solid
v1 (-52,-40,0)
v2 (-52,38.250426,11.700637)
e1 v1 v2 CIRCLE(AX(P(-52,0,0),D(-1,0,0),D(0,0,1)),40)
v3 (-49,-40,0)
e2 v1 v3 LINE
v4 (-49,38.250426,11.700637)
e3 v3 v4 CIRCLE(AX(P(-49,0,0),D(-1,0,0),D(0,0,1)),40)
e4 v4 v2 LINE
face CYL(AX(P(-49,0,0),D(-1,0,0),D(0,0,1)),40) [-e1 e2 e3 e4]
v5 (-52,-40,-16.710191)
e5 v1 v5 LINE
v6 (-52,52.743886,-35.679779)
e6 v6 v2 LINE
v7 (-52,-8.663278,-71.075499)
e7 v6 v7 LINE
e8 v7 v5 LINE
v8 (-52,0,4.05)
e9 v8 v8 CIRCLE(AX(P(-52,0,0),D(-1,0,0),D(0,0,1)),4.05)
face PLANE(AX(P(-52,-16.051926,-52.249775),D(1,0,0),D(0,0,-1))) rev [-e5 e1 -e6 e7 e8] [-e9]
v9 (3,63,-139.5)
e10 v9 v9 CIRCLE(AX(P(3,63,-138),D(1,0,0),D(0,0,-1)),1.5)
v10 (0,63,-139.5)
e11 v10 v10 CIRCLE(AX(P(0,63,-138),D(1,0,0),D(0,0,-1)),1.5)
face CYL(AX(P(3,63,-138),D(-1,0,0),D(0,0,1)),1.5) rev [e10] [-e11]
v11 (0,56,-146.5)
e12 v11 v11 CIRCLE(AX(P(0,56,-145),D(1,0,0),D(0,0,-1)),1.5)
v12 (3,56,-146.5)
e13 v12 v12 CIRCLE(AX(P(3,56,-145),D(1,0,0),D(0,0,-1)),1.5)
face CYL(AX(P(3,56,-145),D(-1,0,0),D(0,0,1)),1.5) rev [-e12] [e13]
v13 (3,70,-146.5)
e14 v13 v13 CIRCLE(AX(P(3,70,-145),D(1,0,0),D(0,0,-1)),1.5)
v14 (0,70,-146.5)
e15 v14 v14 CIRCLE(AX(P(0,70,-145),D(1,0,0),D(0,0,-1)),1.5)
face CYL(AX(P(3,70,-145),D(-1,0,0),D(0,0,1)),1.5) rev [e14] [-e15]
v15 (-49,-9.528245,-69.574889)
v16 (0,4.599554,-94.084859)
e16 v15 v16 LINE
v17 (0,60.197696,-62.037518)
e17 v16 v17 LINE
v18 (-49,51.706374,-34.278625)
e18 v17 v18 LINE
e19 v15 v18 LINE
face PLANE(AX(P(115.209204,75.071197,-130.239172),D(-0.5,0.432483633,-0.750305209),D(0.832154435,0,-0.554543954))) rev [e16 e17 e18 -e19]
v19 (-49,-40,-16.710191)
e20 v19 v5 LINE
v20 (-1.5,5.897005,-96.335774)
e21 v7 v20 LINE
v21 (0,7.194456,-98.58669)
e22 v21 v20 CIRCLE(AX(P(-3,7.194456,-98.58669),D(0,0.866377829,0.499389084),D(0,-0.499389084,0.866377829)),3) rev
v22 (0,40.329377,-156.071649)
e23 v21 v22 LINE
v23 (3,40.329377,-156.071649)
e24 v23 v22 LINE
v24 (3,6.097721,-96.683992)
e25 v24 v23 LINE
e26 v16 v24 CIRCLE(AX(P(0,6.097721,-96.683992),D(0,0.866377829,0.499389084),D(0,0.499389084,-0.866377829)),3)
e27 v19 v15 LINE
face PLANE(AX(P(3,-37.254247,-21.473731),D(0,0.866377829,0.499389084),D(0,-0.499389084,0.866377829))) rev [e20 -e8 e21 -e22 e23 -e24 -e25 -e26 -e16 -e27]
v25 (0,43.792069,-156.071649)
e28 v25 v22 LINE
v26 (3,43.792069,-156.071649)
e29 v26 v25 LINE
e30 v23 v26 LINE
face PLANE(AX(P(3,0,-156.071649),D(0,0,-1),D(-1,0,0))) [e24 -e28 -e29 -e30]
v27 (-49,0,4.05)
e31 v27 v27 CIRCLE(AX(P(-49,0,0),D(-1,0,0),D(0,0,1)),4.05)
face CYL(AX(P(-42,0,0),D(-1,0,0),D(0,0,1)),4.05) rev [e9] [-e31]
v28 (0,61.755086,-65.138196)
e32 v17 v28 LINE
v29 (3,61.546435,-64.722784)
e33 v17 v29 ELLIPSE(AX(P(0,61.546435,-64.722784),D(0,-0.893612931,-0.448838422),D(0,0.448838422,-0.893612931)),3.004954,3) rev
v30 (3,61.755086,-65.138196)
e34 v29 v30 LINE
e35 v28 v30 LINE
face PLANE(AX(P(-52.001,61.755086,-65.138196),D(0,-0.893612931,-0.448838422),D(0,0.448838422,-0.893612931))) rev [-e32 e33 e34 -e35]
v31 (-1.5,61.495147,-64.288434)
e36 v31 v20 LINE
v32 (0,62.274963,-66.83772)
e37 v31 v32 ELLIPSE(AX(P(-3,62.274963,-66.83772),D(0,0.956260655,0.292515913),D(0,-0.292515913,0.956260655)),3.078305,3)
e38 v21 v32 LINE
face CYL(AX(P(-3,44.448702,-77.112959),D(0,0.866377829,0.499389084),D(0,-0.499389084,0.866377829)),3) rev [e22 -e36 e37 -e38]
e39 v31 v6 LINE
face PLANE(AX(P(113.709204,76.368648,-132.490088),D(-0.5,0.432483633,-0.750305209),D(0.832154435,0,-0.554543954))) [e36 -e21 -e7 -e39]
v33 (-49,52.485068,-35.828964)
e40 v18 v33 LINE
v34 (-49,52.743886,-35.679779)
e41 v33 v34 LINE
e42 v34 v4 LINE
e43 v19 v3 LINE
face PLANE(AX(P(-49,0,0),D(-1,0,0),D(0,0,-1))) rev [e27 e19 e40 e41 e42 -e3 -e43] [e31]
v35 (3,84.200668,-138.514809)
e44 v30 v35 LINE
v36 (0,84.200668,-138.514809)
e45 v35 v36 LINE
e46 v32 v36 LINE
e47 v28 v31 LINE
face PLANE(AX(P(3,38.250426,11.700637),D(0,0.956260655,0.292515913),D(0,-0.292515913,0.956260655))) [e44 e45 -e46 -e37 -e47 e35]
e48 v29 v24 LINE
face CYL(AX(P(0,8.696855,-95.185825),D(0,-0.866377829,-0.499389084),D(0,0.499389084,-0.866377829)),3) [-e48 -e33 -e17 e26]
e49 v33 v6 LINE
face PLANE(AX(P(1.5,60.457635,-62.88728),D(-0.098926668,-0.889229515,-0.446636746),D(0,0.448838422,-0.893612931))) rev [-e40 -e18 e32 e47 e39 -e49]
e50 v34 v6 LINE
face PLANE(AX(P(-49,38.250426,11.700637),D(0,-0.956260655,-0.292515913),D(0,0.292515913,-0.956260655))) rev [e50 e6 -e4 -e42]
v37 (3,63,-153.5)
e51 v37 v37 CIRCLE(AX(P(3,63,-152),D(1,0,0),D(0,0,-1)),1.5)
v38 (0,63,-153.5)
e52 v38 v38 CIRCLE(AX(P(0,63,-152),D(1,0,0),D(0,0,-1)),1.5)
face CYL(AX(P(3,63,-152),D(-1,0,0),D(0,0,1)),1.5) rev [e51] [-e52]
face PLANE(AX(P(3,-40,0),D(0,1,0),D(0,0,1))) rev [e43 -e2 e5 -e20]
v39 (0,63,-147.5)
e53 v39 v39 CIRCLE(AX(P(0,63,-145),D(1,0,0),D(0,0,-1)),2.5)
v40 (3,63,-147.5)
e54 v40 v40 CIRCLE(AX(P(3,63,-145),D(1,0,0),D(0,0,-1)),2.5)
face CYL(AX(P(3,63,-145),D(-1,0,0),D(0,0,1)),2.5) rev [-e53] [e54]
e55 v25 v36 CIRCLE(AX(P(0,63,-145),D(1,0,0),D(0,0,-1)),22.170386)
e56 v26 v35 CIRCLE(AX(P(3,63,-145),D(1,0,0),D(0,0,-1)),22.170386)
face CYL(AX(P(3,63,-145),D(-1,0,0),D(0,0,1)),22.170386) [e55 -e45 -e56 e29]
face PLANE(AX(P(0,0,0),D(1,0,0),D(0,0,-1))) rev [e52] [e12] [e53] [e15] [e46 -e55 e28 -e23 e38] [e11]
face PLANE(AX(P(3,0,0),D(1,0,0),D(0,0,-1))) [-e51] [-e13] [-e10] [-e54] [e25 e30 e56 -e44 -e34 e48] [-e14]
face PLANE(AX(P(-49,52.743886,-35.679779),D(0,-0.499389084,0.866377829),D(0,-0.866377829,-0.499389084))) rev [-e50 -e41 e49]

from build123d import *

# Parameters (mm, degrees)
SKETCH_2_R           = 3
SKETCH_2_R_2         = 1.5
SKETCH_2_R_3         = 2.5
EXTRUDE_1_DEPTH      = 3
EXTRUDE_2_DEPTH      = 196
SKETCH_5_R           = 8
CUT_EXTRUDE_1_DEPTH  = 10
SKETCH_6_R           = 4.05
CUT_EXTRUDE_2_DEPTH  = 10
SKETCH_8_R           = 40
EXTRUDE_3_DEPTH      = 3
EXTRUDE_START        = -61
EXTRUDE_4_DEPTH      = 64
EXTRUDE_5_DEPTH      = 3
EXTRUDE_START_2      = -3
EXTRUDE_14_DEPTH     = 3
EXTRUDE_15_DEPTH     = 3
SKETCH_16_R          = 40
EXTRUDE_16_DEPTH     = 3
CUT_EXTRUDE_START    = -20
CUT_EXTRUDE_5_DEPTH  = 20
CUT_EXTRUDE_6_DEPTH  = 20
CUT_EXTRUDE_7_DEPTH  = 3
FILLET_3_R           = 3
FILLET_4_R           = 3
FILLET_5_R           = 3
FILLET_6_R           = 3
SKETCH_22_R          = 7.75
CUT_EXTRUDE_8_DEPTH  = 10
SKETCH_23_R          = 4.05
CUT_EXTRUDE_9_DEPTH  = 10
CUT_EXTRUDE_10_DEPTH = 10
SKETCH_25_W          = 514.702896461
SKETCH_25_H          = 285.568662858
CUT_EXTRUDE_11_DEPTH = 80


# Some blends are built 0.0001 mm under size
with BuildPart() as part:
    # 草图2 → 凸台-拉伸1 (new body)
    with BuildSketch(Plane(origin=(0, 0, 0), x_dir=(0, 0, -1), z_dir=(1, 0, 0))):
        with BuildLine():
            Line((138.514809283, 84.200667909), (-11.70063651, 38.25042621))
            ThreePointArc((-11.70063651, 38.25042621), (-39.560188627, -5.915359313), (0, -40))
            Line((0, -40), (16.710190716, -40))
            Line((16.710190716, -40), (156.071648789, 40.329376559))
            Line((156.071648789, 40.329376559), (156.071648789, 43.792069046))
            ThreePointArc((156.071648789, 43.792069046), (165.334026038, 71.834783727), (138.514809283, 84.200667909))
        make_face()
        Circle(SKETCH_2_R, mode=Mode.SUBTRACT)
        with Locations((145, 70)):
            Circle(SKETCH_2_R_2, mode=Mode.SUBTRACT)
        with Locations((138, 63)):
            Circle(SKETCH_2_R_2, mode=Mode.SUBTRACT)
        with Locations((145, 56)):
            Circle(SKETCH_2_R_2, mode=Mode.SUBTRACT)
        with Locations((145, 63)):
            Circle(SKETCH_2_R_3, mode=Mode.SUBTRACT)
        with Locations((152, 63)):
            Circle(SKETCH_2_R_2, mode=Mode.SUBTRACT)
    extrude_1 = extrude(amount=EXTRUDE_1_DEPTH)

    # 草图4 → 凸台-拉伸2 (add)
    with BuildSketch(Plane(origin=(3, 0, 0), x_dir=(0, 0, -1), z_dir=(1, 0, 0))):
        with BuildLine():
            Line((0, -40), (16.710190716, -40))
            Line((16.710190716, -40), (156.071648789, 40.329376559))
            Line((156.071648789, 40.329376559), (156.071648789, 43.792069046))
            Line((156.071648789, 43.792069046), (19.975563357, -34.655113166))
            ThreePointArc((19.975563357, -34.655113166), (10.339136167, -38.640681455), (0, -40))
        make_face()
    extrude(amount=EXTRUDE_2_DEPTH)

    # 镜向2: 凸台-拉伸1 across plane
    add(extrude_1.mirror(Plane(origin=(101, 0, 0), x_dir=(0, 0, 1), z_dir=(1, 0, 0))))

    # 草图5 → 切除-拉伸1 (cut)
    with BuildSketch(Plane(origin=(202, 0, 0), x_dir=(0, 0, -1), z_dir=(1, 0, 0))):
        Circle(SKETCH_5_R)
    extrude(amount=-CUT_EXTRUDE_1_DEPTH, mode=Mode.SUBTRACT)

    # 草图6 → 切除-拉伸2 (cut)
    with BuildSketch(Plane.ZY):
        Circle(SKETCH_6_R)
    extrude(amount=-CUT_EXTRUDE_2_DEPTH, mode=Mode.SUBTRACT)

    # 草图9 → 凸台-拉伸4 (add)
    with BuildSketch(Plane(origin=(251, 0, 0), x_dir=(0, 0, -1), z_dir=(1, 0, 0)).offset(EXTRUDE_START)):
        with BuildLine():
            Line((0, -40), (16.710190716, -40))
            Line((16.710190716, -40), (53.747942483, -18.651059269))
            Line((53.747942483, -18.651059269), (52.249775231, -16.051925781))
            Line((52.249775231, -16.051925781), (19.975563357, -34.655113166))
            ThreePointArc((19.975563357, -34.655113166), (10.339136167, -38.640681455), (0, -40))
        make_face()
    extrude_4 = extrude(amount=EXTRUDE_4_DEPTH)

    # 草图10 → 凸台-拉伸5 (add)
    with BuildSketch(Plane(origin=(0, -37.254246654, -21.473730609), x_dir=(1, 0, 0), z_dir=(0, -0.8663778291595938, -0.49938908392225567))):
        Polygon((254, -37.251890328), (254, -57.251890328), (202, -87.274104325), (202, -37.251890328), align=None)
    extrude_5 = extrude(amount=-EXTRUDE_5_DEPTH)



with BuildPart() as body_2:
    # 草图8 → 凸台-拉伸3 (new body)
    with BuildSketch(Plane(origin=(251, 0, 0), x_dir=(0, 0, -1), z_dir=(1, 0, 0))):
        Circle(SKETCH_8_R)
    extrude(amount=EXTRUDE_3_DEPTH)


with BuildPart() as part_1:
    add(part.part)

    add(body_2.part)  # 凸台-拉伸14 merges body 2
    # 草图14 → 凸台-拉伸14 (add)
    with BuildSketch(Plane(origin=(254, 0, 0), x_dir=(0, 0, -1), z_dir=(1, 0, 0)).offset(EXTRUDE_START_2)):
        with BuildLine():
            Line((-11.70063651, 38.25042621), (35.679778873, 52.743886101))
            Line((35.679778873, 52.743886101), (69.577331814, -6.064144103))
            Line((69.577331814, -6.064144103), (19.975563357, -34.655113166))
            ThreePointArc((19.975563357, -34.655113166), (36.686823541, 15.939792297), (-11.70063651, 38.25042621))
        make_face()
    extrude_14 = extrude(amount=EXTRUDE_14_DEPTH)

    # 草图15 → 凸台-拉伸15 (add)
    with BuildSketch(Plane(origin=(88.290795719, 76.368648195, -132.490087928), x_dir=(-0.8660254037844362, 0.24969454196113003, -0.4331889145798008), z_dir=(0.5000000000000044, 0.4324836330493111, -0.7503052093278204))):
        Polygon((-191.344507397, -43), (-191.344507397, 27.878041456), (-131.300079402, 20.97393325), (-131.300079402, -43), align=None)
    extrude_15 = extrude(amount=-EXTRUDE_15_DEPTH)

    # 镜向8: 凸台-拉伸15 across plane
    add(extrude_15.mirror(Plane(origin=(101, 0, 0), x_dir=(0, 0, 1), z_dir=(1, 0, 0))))

    # 镜向10: 凸台-拉伸5 across plane
    add(extrude_5.mirror(Plane(origin=(101, 0, 0), x_dir=(0, 0, 1), z_dir=(1, 0, 0))))

    # 镜向11: 凸台-拉伸4 across plane
    add(extrude_4.mirror(Plane(origin=(101, 0, 0), x_dir=(0, 0, 1), z_dir=(1, 0, 0))))

    # 镜向12: 凸台-拉伸14 across plane
    add(extrude_14.mirror(Plane(origin=(101, 0, 0), x_dir=(0, 0, 1), z_dir=(1, 0, 0))))

    # 草图16 → 凸台-拉伸16 (add)
    with BuildSketch(Plane.ZY.offset(52)):
        Circle(SKETCH_16_R)
    extrude(amount=-EXTRUDE_16_DEPTH)

    # 草图17 → 切除-拉伸5 (cut)
    with BuildSketch(Plane(origin=(202, 0, 0), x_dir=(0, 0, -1), z_dir=(1, 0, 0)).offset(CUT_EXTRUDE_START)):
        with BuildLine():
            Line((-11.120326036, 38.423148607), (61.739147636, 60.715331959))
            Line((61.739147636, 60.715331959), (65.138195736, 61.755085767))
            Line((65.138195736, 61.755085767), (62.037518083, 60.197696416))
            Line((62.037518083, 60.197696416), (92.586691567, 7.198687311))
            Line((92.586691567, 7.198687311), (19.975563357, -34.655113166))
            ThreePointArc((19.975563357, -34.655113166), (-36.806411031, -15.66167638), (-11.120326036, 38.423148607))
        make_face()
    extrude(amount=CUT_EXTRUDE_5_DEPTH, mode=Mode.SUBTRACT)


with BuildPart() as cut_extrude_5_piece_1:
    # of the separate pieces the step leaves, piece 1, a body of its own (cut_extrude_5_pieces)
    add(part_1.part.solids().sort_by_distance((0, 43.792069046, -156.071648789))[0])

    # 草图21 → 切除-拉伸7 (cut)
    with BuildSketch(Plane(origin=(3, 0, 0), x_dir=(0, 0, -1), z_dir=(1, 0, 0))):
        with BuildLine():
            Line((92.586691567, 7.198687311), (62.037518083, 60.197696416))
            Line((62.037518083, 60.197696416), (65.138195736, 61.755085767))
            Line((65.138195736, 61.755085767), (61.739147636, 60.715331959))
            Line((61.739147636, 60.715331959), (-11.70063651, 38.25042621))
            ThreePointArc((-11.70063651, 38.25042621), (-36.686823541, -15.939792297), (19.975563357, -34.655113166))
            Line((19.975563357, -34.655113166), (92.586691567, 7.198687311))
        make_face()
    extrude(amount=-CUT_EXTRUDE_7_DEPTH, mode=Mode.SUBTRACT)

    # 圆角3
    fillet_3_edges = [cut_extrude_5_piece_1.edges().sort_by_distance(p)[0] for p in [
        (3, 33.698191863, -77.312104825),
    ]]
    fillet(fillet_3_edges, radius=FILLET_3_R - 0.0001)  # a hair under: the kernel refuses the full size

    # 圆角4
    fillet_4_edges = [cut_extrude_5_piece_1.edges().sort_by_distance(p)[0] for p in [
        (199, 33.698191863, -77.312104825),
    ]]
    fillet(fillet_4_edges, radius=FILLET_4_R - 0.0001)  # a hair under: the kernel refuses the full size

    # 圆角5
    # the kernel refuses this fillet: 3 mm, written as the material it adds along each edge
    with BuildSketch(Plane(origin=(202, 65.506611814, -62.97577757), x_dir=(0, 0.49938908392225534, -0.8663778291595939), z_dir=(0, -0.866377829159594, -0.4993890839222554))) as fillet_5_piece_1_section:
        with BuildLine():
            CenterArc((FILLET_5_R * 0.57735026919, FILLET_5_R), FILLET_5_R, 210, 60)
            Line((-FILLET_5_R * 0.288675134595, FILLET_5_R * 0.5), (0, 0))
            Line((0, 0), (FILLET_5_R * 0.57735026919, 0))
        make_face()
    fillet_5_piece_1 = extrude(amount=68.304060269, mode=Mode.PRIVATE)
    fillet_5_piece_1 = split(fillet_5_piece_1, bisect_by=Plane(origin=(202.325553984, 63.906694987, -72.171998522), z_dir=(0, -0.9562606552534866, -0.2925159127537726)), keep=Keep.TOP, mode=Mode.PRIVATE)
    fillet_5_piece_1 = split(fillet_5_piece_1, bisect_by=Plane(origin=(199.177617764, 62.412552566, -67.072312804), z_dir=(0.09892666816624712, -0.8892295154916122, -0.44663674625368427)), keep=Keep.TOP, mode=Mode.PRIVATE)
    add(fillet_5_piece_1)

    # 圆角6
    # the kernel refuses this fillet: 3 mm, written as the material it adds along each edge
    with BuildSketch(Plane(origin=(0, 6.329488355, -97.086079656), x_dir=(2.017234182721707e-14, 0.49938908392225534, -0.8663778291595939), z_dir=(0, 0.8663778291595939, 0.4993890839222554))) as fillet_6_piece_1_section:
        with BuildLine():
            CenterArc((FILLET_6_R * 0.57735026919, FILLET_6_R), FILLET_6_R, 210, 60)
            Line((-FILLET_6_R * 0.288675134595, FILLET_6_R * 0.5), (0, 0))
            Line((0, 0), (FILLET_6_R * 0.57735026919, 0))
        make_face()
    fillet_6_piece_1 = extrude(amount=68.304060269, mode=Mode.PRIVATE)
    fillet_6_piece_1 = split(fillet_6_piece_1, bisect_by=Plane(origin=(-0.325553984, 63.906694987, -72.171998522), z_dir=(0, -0.9562606552534866, -0.2925159127537726)), keep=Keep.TOP, mode=Mode.PRIVATE)
    fillet_6_piece_1 = split(fillet_6_piece_1, bisect_by=Plane(origin=(2.822382236, 62.412552566, -67.072312804), z_dir=(-0.09892666816624712, -0.8892295154916122, -0.44663674625368427)), keep=Keep.TOP, mode=Mode.PRIVATE)
    add(fillet_6_piece_1)

    # 草图22 → 切除-拉伸8 (cut)
    with BuildSketch(Plane(origin=(254, 0, 0), x_dir=(0, 0, -1), z_dir=(1, 0, 0))):
        Circle(SKETCH_22_R)
    extrude(amount=-CUT_EXTRUDE_8_DEPTH, mode=Mode.SUBTRACT)

    # 草图23 → 切除-拉伸9 (cut)
    with BuildSketch(Plane.ZY.offset(52)):
        Circle(SKETCH_23_R)
    extrude(amount=-CUT_EXTRUDE_9_DEPTH, mode=Mode.SUBTRACT)

    # 草图24 → 切除-拉伸10 (cut)
    with BuildSketch(Plane(origin=(0, -37.254246654, -21.473730609), x_dir=(1, 0, 0), z_dir=(0, -0.8663778291595938, -0.49938908392225567))):
        with BuildLine():
            Line((-49, 40), (-49, -55.51983952))
            Line((-49, -55.51983952), (0, -83.81000271))
            ThreePointArc((0, -83.81000271), (2.121320344, -84.688682367), (3, -86.81000271))
            Line((3, -86.81000271), (3, -87.274104325))
            Line((3, -87.274104325), (3, -179.256683584))
            Line((3, -179.256683584), (199, -179.256683584))
            Line((199, -179.256683584), (199, -87.274104325))
            Line((199, -87.274104325), (199, -86.81000271))
            ThreePointArc((199, -86.81000271), (199.878679656, -84.688682367), (202, -83.81000271))
            Line((202, -83.81000271), (251, -55.51983952))
            Line((251, -55.51983952), (251, 40))
            Line((251, 40), (-49, 40))
        make_face()
    extrude(amount=-CUT_EXTRUDE_10_DEPTH, mode=Mode.SUBTRACT)


with BuildPart() as cut_extrude_5_piece_2:
    # of the separate pieces the step leaves, piece 2, a body of its own (cut_extrude_5_pieces)
    add(part_1.part.solids().sort_by_distance((202, 60.715331959, -61.739147636))[0])

    # 草图18 → 切除-拉伸6 (cut)
    with BuildSketch(Plane(origin=(0, 38.25042621, 11.70063651), x_dir=(1, 0, 0), z_dir=(0, 0.9562606552534866, 0.2925159127537726))):
        Polygon((199, 76.798918519), (202, 76.932821805), (202, 0), (199, 0), align=None)
    extrude(amount=-CUT_EXTRUDE_6_DEPTH, mode=Mode.SUBTRACT)


with BuildPart() as cut_extrude_10_piece_1:
    # of the separate pieces the step leaves, piece 1, a body of its own (cut_extrude_10_pieces)
    add(cut_extrude_5_piece_1.part.solids().sort_by_distance((-1.5, 5.897004722, -96.335774447))[0])


with BuildPart() as cut_extrude_10_piece_2:
    # of the separate pieces the step leaves, piece 2, a body of its own (cut_extrude_10_pieces)
    add(cut_extrude_5_piece_1.part.solids().sort_by_distance((199, 6.097721075, -96.683992306))[0])

    # 草图25 → 切除-拉伸11 (cut)
    with BuildSketch(Plane(origin=(254, 0, 0), x_dir=(0, 0, -1), z_dir=(1, 0, 0))):
        with Locations((-76.2896691, 93.84361465)):
            Rectangle(SKETCH_25_W, SKETCH_25_H)
    extrude(amount=-CUT_EXTRUDE_11_DEPTH, mode=Mode.SUBTRACT)


solid = cut_extrude_10_piece_1.part
